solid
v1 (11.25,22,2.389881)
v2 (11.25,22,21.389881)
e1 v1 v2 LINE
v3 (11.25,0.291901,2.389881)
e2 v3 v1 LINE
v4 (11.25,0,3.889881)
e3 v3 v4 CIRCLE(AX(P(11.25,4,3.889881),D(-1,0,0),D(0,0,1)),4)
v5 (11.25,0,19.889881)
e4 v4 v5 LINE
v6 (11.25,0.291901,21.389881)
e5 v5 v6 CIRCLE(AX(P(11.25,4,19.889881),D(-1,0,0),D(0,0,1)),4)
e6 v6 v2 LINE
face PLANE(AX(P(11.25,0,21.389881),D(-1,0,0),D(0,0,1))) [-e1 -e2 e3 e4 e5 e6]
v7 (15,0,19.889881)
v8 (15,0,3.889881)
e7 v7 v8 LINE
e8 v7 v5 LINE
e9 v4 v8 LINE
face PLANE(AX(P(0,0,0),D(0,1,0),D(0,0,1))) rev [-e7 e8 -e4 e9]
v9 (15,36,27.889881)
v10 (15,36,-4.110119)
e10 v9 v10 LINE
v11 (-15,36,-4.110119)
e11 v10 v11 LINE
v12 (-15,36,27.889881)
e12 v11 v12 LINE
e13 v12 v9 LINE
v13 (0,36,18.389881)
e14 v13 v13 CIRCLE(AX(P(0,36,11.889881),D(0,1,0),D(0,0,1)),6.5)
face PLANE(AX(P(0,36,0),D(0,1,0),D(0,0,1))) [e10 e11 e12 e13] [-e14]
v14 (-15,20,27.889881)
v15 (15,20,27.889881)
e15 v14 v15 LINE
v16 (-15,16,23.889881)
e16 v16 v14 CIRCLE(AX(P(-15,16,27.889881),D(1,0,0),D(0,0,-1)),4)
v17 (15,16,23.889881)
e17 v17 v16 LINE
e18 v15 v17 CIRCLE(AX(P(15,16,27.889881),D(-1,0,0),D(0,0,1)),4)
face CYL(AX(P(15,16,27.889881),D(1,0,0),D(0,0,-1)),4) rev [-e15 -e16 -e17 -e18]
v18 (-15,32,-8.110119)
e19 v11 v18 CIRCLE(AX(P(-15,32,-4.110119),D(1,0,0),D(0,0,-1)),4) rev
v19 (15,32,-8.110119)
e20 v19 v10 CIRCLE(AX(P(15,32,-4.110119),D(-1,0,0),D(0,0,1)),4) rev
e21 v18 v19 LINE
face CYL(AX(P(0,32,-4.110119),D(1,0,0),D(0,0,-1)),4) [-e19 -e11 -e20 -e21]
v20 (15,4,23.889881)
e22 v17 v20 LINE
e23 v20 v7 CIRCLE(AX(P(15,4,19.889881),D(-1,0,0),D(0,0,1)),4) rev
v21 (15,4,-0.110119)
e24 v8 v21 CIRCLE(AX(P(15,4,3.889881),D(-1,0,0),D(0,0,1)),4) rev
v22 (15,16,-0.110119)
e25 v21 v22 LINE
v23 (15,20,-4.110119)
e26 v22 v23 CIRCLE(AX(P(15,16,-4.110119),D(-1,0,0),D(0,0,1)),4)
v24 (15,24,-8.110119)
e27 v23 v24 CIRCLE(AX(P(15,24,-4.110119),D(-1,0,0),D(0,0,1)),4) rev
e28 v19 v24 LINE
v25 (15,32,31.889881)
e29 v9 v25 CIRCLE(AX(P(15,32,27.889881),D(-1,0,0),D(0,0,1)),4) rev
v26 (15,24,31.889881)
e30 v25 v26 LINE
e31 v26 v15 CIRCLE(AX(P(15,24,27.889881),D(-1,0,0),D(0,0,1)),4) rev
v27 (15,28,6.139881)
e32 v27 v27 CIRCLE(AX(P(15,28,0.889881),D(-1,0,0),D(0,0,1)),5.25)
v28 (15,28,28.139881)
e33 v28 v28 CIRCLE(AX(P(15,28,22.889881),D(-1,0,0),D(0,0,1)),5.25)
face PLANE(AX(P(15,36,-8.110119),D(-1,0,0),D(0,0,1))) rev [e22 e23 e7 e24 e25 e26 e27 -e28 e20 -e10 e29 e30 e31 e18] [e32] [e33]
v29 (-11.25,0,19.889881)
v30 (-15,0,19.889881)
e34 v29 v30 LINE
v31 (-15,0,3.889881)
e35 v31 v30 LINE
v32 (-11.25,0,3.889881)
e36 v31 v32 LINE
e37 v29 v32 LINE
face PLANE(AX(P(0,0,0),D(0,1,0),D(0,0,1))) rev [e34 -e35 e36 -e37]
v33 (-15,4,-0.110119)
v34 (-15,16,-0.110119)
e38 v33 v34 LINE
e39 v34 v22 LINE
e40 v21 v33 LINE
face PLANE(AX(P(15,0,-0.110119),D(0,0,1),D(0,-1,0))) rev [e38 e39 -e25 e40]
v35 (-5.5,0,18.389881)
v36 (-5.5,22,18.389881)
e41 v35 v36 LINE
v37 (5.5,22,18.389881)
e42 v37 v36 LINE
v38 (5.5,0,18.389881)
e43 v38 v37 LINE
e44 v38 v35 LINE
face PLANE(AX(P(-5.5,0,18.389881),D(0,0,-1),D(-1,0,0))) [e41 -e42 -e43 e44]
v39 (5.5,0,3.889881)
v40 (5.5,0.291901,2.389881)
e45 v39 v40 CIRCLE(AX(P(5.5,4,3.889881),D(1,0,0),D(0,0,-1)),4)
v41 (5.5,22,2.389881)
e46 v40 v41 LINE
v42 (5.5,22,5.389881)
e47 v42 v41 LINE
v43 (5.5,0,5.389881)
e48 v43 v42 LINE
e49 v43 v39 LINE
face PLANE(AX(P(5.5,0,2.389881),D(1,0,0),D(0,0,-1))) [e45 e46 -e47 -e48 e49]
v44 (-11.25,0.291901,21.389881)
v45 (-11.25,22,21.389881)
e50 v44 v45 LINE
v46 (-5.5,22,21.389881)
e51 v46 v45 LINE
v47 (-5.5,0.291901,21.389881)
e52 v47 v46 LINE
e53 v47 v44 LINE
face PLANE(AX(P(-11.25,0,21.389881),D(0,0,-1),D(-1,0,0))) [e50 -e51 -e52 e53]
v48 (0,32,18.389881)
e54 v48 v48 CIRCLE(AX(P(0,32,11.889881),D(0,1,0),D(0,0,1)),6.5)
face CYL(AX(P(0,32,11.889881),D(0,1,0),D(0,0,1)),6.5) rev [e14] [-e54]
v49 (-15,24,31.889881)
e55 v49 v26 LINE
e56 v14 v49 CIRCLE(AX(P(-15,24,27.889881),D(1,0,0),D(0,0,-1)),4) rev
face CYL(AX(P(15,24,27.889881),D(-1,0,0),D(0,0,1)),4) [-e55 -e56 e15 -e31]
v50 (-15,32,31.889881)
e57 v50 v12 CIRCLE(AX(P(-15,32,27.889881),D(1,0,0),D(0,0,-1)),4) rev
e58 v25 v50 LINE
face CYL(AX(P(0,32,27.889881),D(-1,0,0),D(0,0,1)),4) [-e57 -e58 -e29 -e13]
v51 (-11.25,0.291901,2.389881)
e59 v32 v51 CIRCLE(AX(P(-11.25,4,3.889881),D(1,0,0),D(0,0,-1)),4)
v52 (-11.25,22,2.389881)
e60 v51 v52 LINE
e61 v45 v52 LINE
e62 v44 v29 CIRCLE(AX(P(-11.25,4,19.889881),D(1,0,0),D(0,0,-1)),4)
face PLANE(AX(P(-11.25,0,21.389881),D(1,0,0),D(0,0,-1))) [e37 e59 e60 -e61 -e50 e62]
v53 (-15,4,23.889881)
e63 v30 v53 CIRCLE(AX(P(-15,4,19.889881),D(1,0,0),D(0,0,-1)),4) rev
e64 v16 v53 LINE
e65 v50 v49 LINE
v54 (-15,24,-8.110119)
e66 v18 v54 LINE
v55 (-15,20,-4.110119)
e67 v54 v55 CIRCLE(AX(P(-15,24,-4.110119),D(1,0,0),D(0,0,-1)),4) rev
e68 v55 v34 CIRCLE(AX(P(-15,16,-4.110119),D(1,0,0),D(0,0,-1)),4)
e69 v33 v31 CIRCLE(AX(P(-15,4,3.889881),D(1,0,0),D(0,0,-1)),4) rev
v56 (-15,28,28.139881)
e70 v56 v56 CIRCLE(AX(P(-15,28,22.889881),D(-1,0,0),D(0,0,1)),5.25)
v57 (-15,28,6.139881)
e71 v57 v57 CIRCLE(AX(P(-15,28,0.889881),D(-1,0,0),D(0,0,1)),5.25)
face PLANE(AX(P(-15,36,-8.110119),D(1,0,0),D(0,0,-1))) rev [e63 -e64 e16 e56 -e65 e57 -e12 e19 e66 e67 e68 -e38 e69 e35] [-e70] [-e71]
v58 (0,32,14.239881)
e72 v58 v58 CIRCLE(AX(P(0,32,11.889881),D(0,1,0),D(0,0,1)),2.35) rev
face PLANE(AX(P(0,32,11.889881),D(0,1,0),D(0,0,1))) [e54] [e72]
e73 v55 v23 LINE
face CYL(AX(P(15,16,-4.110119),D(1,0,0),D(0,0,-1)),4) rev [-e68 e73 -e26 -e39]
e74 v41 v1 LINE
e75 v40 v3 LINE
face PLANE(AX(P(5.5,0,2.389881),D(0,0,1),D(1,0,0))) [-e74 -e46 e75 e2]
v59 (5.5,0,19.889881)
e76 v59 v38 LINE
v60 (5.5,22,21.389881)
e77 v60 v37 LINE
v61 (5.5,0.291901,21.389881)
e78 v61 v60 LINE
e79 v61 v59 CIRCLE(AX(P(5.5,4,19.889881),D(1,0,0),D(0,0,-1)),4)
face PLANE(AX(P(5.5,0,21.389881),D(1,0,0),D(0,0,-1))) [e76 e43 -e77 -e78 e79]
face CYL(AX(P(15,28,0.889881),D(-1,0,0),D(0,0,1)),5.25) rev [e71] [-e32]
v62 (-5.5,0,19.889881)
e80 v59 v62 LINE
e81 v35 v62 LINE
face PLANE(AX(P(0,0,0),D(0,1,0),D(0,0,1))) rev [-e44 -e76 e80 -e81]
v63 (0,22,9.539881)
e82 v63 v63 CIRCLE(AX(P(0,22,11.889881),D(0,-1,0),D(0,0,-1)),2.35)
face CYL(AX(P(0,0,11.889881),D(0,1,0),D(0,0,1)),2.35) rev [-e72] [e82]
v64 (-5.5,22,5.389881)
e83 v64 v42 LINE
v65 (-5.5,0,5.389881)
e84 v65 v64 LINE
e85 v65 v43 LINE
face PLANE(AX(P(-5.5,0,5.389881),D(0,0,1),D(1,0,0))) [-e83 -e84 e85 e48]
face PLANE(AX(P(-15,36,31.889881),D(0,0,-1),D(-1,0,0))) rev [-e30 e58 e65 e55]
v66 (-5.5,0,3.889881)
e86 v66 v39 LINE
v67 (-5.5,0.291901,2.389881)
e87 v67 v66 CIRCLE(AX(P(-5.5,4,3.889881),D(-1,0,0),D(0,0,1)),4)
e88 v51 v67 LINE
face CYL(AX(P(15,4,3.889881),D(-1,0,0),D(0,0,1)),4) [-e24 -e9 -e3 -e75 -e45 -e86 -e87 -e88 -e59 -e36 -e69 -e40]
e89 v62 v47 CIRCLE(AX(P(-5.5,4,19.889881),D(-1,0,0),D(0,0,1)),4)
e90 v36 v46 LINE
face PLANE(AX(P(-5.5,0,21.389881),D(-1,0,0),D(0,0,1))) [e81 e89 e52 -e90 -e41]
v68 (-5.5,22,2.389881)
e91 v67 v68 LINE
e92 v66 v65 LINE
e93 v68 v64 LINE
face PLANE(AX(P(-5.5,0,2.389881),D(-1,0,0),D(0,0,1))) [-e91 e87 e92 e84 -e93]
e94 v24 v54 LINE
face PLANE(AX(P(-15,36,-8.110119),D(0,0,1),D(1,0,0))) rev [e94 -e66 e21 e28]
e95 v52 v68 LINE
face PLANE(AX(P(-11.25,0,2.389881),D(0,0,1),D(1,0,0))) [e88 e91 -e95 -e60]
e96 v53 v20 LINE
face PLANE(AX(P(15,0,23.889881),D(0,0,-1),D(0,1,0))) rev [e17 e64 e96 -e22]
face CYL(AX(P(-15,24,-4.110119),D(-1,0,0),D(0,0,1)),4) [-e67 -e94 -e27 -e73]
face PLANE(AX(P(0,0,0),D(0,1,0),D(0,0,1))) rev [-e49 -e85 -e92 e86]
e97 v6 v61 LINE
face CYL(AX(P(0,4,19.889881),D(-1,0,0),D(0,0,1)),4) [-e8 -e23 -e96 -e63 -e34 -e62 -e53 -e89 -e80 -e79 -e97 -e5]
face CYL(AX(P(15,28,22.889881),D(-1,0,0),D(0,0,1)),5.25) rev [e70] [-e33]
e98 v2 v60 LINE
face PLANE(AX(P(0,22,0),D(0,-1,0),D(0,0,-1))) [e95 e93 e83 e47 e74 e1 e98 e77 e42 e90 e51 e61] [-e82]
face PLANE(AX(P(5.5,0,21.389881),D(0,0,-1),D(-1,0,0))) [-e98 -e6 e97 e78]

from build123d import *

# Parameters (mm, degrees)
SKETCH1_W           = 30
SKETCH1_H           = 40
BOSS_EXTRUDE1_DEPTH = 36
CUT_EXTRUDE1_START  = 14
CUT_EXTRUDE1_DEPTH  = 37.378214609
SKETCH4_R           = 2.35
CUT_EXTRUDE3_DEPTH  = 51.378214609
SKETCH5_R           = 6.5
CUT_EXTRUDE4_DEPTH  = 4
SKETCH12_R          = 5.25
SKETCH12_W          = 8
SKETCH12_H          = 20
CUT_EXTRUDE5_DEPTH  = 57.683017802
FILLET1_R           = 4


with BuildPart() as part:
    # Sketch1 → Boss-Extrude1 (new body)
    with BuildSketch(Plane(origin=(0, 0, 0), x_dir=(1, 0, 0), z_dir=(0, 1, 0))):
        with Locations((0, -11.889880952)):
            Rectangle(SKETCH1_W, SKETCH1_H)
    extrude(amount=BOSS_EXTRUDE1_DEPTH)

    # Sketch2 → Cut-Extrude1 (cut, through all)
    with BuildSketch(Plane.XZ.offset(-36).offset(CUT_EXTRUDE1_START)):
        Polygon((-11.25, 21.389880952), (-5.5, 21.389880952), (-5.5, 18.389880952), (5.5, 18.389880952), (5.5, 21.389880952), (11.25, 21.389880952), (11.25, 2.389880952), (5.5, 2.389880952), (5.5, 5.389880952), (-5.5, 5.389880952), (-5.5, 2.389880952), (-11.25, 2.389880952), align=None)
    extrude(amount=CUT_EXTRUDE1_DEPTH, mode=Mode.SUBTRACT)

    # Sketch4 → Cut-Extrude3 (cut, through all)
    with BuildSketch(Plane(origin=(0, 36, 0), x_dir=(1, 0, 0), z_dir=(0, 1, 0))):
        with Locations(Location((0, -11.889880952, 0), (0, 0, 270))):
            Circle(SKETCH4_R)
    extrude(amount=-CUT_EXTRUDE3_DEPTH, mode=Mode.SUBTRACT)

    # Sketch5 → Cut-Extrude4 (cut)
    with BuildSketch(Plane(origin=(0, 36, 0), x_dir=(1, 0, 0), z_dir=(0, 1, 0))):
        with Locations(Location((0, -11.889880952, 0), (0, 0, 270))):
            Circle(SKETCH5_R)
    extrude(amount=-CUT_EXTRUDE4_DEPTH, mode=Mode.SUBTRACT)

    # Sketch12 → Cut-Extrude5 (cut, through all)
    with BuildSketch(Plane.ZY.offset(15)):
        with Locations((0.889880952, 28)):
            Circle(SKETCH12_R)
        with Locations((22.889880952, 28)):
            Circle(SKETCH12_R)
        with Locations((-4.110119048, 10)):
            Rectangle(SKETCH12_W, SKETCH12_H)
        with Locations((27.889880952, 10)):
            Rectangle(SKETCH12_W, SKETCH12_H)
    extrude(amount=-CUT_EXTRUDE5_DEPTH, mode=Mode.SUBTRACT)

    # Fillet1
    # the kernel refuses this fillet: 4 mm, written as the material it adds along each edge
    with BuildSketch(Plane(origin=(-15, 20, -0.110119048), x_dir=(0, 0, -1), z_dir=(1, 0, 0)), Plane(origin=(-15, 20, 23.889880952), x_dir=(0, -1, 0), z_dir=(1, 0, 0))) as fillet1_piece_1:
        with BuildLine():
            CenterArc((FILLET1_R, -FILLET1_R), FILLET1_R, 90, 90)
            Line((0, -FILLET1_R), (0, 0))
            Line((0, 0), (FILLET1_R, 0))
        make_face()
    extrude(amount=30)
    # the kernel refuses this fillet: 4 mm, written as the material it takes off along each edge
    with BuildSketch(Plane(origin=(-25, 0, 23.889880952), x_dir=(0, 0, -1), z_dir=(1, 0, 0)), Plane(origin=(-25, 0, -0.110119048), x_dir=(0, 1, 0), z_dir=(1, 0, 0)), Plane(origin=(-25, 20, -8.110119048), x_dir=(0, 1, 0), z_dir=(1, 0, 0)), Plane(origin=(25, 36, 31.889880952), x_dir=(0, 0, -1), z_dir=(-1, 0, 0)), Plane(origin=(-25, 20, 31.889880952), x_dir=(0, 0, -1), z_dir=(1, 0, 0))) as fillet1_2_piece_1:
        with BuildLine():
            CenterArc((FILLET1_R, FILLET1_R), FILLET1_R, 180, 90)
            Line((0, FILLET1_R), (0, 0))
            Line((0, 0), (FILLET1_R, 0))
        make_face()
    extrude(amount=50, mode=Mode.SUBTRACT)
    with BuildSketch(Plane(origin=(-25, 36, -8.110119048), x_dir=(0, -1, 0), z_dir=(1, 0, 0))) as fillet1_2_piece_2:
        with BuildLine():
            CenterArc((FILLET1_R, -FILLET1_R), FILLET1_R, 90, 90)
            Line((0, -FILLET1_R), (0, 0))
            Line((0, 0), (FILLET1_R, 0))
        make_face()
    extrude(amount=50, mode=Mode.SUBTRACT)


solid = part.part
